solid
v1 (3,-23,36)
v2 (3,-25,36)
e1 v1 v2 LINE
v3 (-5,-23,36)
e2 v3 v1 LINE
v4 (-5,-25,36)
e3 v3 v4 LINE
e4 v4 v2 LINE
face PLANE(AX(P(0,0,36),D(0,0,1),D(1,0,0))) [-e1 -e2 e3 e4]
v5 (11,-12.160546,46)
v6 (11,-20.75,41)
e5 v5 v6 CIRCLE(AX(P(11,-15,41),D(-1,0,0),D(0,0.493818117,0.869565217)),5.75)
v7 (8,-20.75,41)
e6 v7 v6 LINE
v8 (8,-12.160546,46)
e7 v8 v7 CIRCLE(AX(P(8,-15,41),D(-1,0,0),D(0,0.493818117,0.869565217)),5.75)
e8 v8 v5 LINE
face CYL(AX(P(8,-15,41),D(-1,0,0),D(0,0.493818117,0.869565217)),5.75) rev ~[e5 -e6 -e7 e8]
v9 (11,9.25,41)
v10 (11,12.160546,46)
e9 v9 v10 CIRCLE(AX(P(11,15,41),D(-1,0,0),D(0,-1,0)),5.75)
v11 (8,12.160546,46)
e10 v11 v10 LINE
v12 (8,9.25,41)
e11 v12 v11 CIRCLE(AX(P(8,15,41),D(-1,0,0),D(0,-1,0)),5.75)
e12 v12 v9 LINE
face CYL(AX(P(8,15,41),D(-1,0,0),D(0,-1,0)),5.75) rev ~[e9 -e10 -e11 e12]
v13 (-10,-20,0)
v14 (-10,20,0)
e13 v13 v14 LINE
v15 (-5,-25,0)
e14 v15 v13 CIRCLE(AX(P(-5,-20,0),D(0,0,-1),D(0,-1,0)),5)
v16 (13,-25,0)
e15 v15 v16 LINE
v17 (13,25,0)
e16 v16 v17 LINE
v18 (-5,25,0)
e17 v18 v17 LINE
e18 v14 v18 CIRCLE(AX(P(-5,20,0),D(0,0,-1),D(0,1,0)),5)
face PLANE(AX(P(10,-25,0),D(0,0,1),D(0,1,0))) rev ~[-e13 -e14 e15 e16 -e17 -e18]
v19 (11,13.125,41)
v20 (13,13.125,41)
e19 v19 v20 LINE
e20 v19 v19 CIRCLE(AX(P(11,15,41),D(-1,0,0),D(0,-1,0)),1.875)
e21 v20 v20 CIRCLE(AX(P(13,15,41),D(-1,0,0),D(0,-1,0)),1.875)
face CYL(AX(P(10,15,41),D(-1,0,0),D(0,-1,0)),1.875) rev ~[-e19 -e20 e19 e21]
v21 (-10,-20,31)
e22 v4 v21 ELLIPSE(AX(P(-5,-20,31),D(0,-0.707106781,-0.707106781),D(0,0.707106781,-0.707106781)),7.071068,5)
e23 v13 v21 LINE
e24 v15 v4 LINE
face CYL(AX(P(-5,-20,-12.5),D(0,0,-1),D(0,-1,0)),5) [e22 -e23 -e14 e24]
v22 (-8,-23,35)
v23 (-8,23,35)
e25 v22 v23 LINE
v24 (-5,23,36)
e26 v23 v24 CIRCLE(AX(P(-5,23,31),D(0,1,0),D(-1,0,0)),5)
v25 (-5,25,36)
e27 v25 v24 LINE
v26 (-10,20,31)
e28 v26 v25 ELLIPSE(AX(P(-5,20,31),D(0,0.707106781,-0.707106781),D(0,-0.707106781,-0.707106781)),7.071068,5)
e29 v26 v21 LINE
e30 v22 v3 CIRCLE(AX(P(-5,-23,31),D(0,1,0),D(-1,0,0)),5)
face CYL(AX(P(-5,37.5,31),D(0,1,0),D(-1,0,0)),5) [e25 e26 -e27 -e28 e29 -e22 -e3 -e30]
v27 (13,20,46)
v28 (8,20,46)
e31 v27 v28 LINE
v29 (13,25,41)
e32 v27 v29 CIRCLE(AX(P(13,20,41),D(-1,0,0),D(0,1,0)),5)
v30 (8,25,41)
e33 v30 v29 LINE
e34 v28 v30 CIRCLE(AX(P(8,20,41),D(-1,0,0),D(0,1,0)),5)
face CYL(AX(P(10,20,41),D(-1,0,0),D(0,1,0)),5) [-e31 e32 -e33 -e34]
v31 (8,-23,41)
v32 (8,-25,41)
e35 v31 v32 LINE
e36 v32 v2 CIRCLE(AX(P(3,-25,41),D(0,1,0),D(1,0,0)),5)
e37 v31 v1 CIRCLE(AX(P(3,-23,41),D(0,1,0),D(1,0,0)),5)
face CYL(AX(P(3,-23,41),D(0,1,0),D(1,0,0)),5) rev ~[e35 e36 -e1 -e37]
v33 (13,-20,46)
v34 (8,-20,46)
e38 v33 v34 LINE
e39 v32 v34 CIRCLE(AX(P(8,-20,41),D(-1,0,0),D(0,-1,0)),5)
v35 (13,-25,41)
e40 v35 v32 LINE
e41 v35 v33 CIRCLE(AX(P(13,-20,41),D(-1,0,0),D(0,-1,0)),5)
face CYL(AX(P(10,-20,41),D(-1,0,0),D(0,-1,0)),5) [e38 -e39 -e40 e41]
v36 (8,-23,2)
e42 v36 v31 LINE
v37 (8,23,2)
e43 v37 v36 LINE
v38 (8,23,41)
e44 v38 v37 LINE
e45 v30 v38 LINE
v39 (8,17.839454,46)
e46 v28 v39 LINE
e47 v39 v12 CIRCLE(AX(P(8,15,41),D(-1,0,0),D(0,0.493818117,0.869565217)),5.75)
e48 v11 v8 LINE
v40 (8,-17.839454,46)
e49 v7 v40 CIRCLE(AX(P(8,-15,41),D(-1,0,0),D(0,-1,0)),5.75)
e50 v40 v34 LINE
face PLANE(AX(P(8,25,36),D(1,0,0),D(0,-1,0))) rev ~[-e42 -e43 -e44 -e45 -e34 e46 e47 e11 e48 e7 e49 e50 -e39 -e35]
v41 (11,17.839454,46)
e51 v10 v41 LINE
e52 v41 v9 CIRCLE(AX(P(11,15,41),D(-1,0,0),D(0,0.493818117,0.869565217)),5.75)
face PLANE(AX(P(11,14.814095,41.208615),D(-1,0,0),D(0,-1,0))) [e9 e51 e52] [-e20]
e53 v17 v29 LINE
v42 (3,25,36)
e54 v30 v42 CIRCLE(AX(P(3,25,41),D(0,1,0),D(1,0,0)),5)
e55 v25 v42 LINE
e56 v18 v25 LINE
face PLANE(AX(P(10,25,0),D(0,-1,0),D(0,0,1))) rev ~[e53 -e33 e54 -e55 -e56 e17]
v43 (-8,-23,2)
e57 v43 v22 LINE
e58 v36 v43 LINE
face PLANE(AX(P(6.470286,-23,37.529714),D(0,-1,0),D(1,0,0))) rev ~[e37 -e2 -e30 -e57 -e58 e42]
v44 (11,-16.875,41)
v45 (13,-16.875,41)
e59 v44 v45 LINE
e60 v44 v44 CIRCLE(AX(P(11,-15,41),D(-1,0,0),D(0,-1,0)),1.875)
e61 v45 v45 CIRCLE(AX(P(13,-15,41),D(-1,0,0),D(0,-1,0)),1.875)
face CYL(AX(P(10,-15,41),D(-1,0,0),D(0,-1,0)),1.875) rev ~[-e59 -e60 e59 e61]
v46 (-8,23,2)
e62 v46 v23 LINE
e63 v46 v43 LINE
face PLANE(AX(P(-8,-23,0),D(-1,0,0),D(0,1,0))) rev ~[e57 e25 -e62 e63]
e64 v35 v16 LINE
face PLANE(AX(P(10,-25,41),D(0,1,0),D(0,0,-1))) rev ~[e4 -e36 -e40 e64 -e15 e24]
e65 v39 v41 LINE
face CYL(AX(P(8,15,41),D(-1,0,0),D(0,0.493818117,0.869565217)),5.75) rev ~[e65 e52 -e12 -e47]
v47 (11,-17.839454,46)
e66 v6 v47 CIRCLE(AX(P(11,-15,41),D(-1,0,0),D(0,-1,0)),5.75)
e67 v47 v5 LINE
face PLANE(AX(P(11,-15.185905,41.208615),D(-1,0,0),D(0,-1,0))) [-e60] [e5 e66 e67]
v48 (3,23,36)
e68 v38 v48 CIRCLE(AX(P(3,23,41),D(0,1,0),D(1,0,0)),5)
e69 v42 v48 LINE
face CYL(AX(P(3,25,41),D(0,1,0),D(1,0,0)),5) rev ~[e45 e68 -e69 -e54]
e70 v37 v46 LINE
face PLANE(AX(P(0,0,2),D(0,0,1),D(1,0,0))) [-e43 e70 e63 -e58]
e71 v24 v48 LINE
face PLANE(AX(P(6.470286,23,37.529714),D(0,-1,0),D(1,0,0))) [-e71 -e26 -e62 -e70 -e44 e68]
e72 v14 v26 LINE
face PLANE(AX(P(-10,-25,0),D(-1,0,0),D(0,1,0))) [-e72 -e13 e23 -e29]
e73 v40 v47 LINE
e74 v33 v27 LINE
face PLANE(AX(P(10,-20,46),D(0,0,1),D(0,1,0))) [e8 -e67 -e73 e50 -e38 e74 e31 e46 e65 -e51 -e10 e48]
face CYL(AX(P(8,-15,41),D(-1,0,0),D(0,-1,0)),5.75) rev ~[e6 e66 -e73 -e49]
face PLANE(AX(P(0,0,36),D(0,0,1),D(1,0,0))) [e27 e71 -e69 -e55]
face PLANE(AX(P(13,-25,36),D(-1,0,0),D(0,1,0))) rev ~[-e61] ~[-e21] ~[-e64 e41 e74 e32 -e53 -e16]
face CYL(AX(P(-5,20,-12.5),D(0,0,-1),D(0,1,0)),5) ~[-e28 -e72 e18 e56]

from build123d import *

# Parameters (mm, degrees)
F0_W        = 20
F0_H        = 50
F0_W_2      = 16
F0_H_2      = 46
F1_DEPTH    = 2
F2_DEPTH    = 36
F4_DEPTH    = 10
F5_R        = 1.875
F6_DEPTH    = 25
F7_T1_DEPTH = 2
F7_T3_DEPTH = 2
F7_T5_DEPTH = 61
F7_T7_DEPTH = 27
F7_T9_DEPTH = 75
F8_DEPTH    = 3
F9_DEPTH    = 3


# Not quite as in the source:
# - a fillet or chamfer that OpenCascade refuses, or shapes differently, is made with other operations: its cross-section is extruded or revolved along the edge and cut away or added


with BuildPart() as f1:
    # F0 (on Top) → F1 (new body)
    with BuildSketch(Plane.XY):
        Rectangle(F0_W, F0_H)
        Rectangle(F0_W_2, F0_H_2, mode=Mode.SUBTRACT)
        Rectangle(F0_W_2, F0_H_2)
    extrude(amount=F1_DEPTH)

    # F0 (on Top) → F2 (join)
    with BuildSketch(Plane.XY):
        Rectangle(F0_W, F0_H)
        Rectangle(F0_W_2, F0_H_2, mode=Mode.SUBTRACT)
    extrude(amount=F2_DEPTH)

    # F3 (on face) → F4 (join)
    with BuildSketch(Plane.XY.offset(36)):
        Polygon((10, -25), (10, 25), (8, 25), (8, 23), (8, -23), (8, -25), align=None)
    extrude(amount=F4_DEPTH)

    # F5 (on face) → F6 (cut)
    with BuildSketch(Plane(origin=(8, 0, 0), x_dir=(0, -1, 0), z_dir=(-1, 0, 0))):
        with Locations((15, 41)):
            Circle(F5_R)
        with Locations((-15, 41)):
            Circle(F5_R)
    extrude(amount=-F6_DEPTH, mode=Mode.SUBTRACT)

    # F7: fillet of radius 5 on 7 edges, made by hand

    # F7_s2 → F7_t1 (join)
    with BuildSketch(Plane.XZ.offset(23)):
        with BuildLine():
            ThreePointArc((8, 41), (6.5355339059, 37.4644660941), (3, 36))
            Line((3, 36), (8, 36))
            Line((8, 36), (8, 41))
        make_face()
    extrude(amount=F7_T1_DEPTH)

    # F7_s4 → F7_t3 (join)
    with BuildSketch(Plane.XZ.offset(-25)):
        with BuildLine():
            ThreePointArc((8, 41), (6.5355339059, 37.4644660941), (3, 36))
            Line((3, 36), (8, 36))
            Line((8, 36), (8, 41))
        make_face()
    extrude(amount=F7_T3_DEPTH)

    # F7_s6 → F7_t5 (cut)
    with BuildSketch(Plane.XY.offset(-12.5)):
        with BuildLine():
            ThreePointArc((-5, -25), (-8.5355339059, -23.5355339059), (-10, -20))
            Line((-10, -20), (-10, -25))
            Line((-10, -25), (-5, -25))
        make_face()
        with BuildLine():
            ThreePointArc((-5, 25), (-8.5355339059, 23.5355339059), (-10, 20))
            Line((-10, 20), (-10, 25))
            Line((-10, 25), (-5, 25))
        make_face()
    extrude(amount=F7_T5_DEPTH, mode=Mode.SUBTRACT)

    # F7_s8 → F7_t7 (cut)
    with BuildSketch(Plane.YZ.offset(-4.5)):
        with BuildLine():
            ThreePointArc((-25, 41), (-23.5355339059, 44.5355339059), (-20, 46))
            Line((-20, 46), (-25, 46))
            Line((-25, 46), (-25, 41))
        make_face()
        with BuildLine():
            ThreePointArc((25, 41), (23.5355339059, 44.5355339059), (20, 46))
            Line((20, 46), (25, 46))
            Line((25, 46), (25, 41))
        make_face()
    extrude(amount=F7_T7_DEPTH, mode=Mode.SUBTRACT)

    # F7_s10 → F7_t9 (cut)
    with BuildSketch(Plane.XZ.offset(-37.5)):
        with BuildLine():
            ThreePointArc((-10, 31), (-8.5355339059, 34.5355339059), (-5, 36))
            Line((-5, 36), (-10, 36))
            Line((-10, 36), (-10, 31))
        make_face()
    extrude(amount=F7_T9_DEPTH, mode=Mode.SUBTRACT)

    # F8 (add): a face of the model
    f8_faces = [f1.faces().sort_by_distance(p)[0] for p in [
        (10, 0, 22.721056124),
    ]]
    extrude(f8_faces, amount=F8_DEPTH)

    # F5 (on face) → F9 (cut)
    with BuildSketch(Plane(origin=(8, 0, 0), x_dir=(0, -1, 0), z_dir=(-1, 0, 0))):
        with BuildLine():
            ThreePointArc((-9.25, 41), (-10.0306257188, 43.8927183155), (-12.1605458271, 46))
            Line((-12.1605458271, 46), (-17.8394541729, 46))
            ThreePointArc((-17.8394541729, 46), (-17.8927183155, 36.0306257188), (-9.25, 41))
        make_face()
        with Locations((-15, 41)):
            Circle(F5_R, mode=Mode.SUBTRACT)
        with BuildLine():
            ThreePointArc((12.1605458271, 46), (12.1072816845, 36.0306257188), (20.75, 41))
            ThreePointArc((20.75, 41), (19.9693742812, 43.8927183155), (17.8394541729, 46))
            Line((17.8394541729, 46), (12.1605458271, 46))
        make_face()
        with Locations((15, 41)):
            Circle(F5_R, mode=Mode.SUBTRACT)
    extrude(amount=-F9_DEPTH, mode=Mode.SUBTRACT)


solid = f1.part
